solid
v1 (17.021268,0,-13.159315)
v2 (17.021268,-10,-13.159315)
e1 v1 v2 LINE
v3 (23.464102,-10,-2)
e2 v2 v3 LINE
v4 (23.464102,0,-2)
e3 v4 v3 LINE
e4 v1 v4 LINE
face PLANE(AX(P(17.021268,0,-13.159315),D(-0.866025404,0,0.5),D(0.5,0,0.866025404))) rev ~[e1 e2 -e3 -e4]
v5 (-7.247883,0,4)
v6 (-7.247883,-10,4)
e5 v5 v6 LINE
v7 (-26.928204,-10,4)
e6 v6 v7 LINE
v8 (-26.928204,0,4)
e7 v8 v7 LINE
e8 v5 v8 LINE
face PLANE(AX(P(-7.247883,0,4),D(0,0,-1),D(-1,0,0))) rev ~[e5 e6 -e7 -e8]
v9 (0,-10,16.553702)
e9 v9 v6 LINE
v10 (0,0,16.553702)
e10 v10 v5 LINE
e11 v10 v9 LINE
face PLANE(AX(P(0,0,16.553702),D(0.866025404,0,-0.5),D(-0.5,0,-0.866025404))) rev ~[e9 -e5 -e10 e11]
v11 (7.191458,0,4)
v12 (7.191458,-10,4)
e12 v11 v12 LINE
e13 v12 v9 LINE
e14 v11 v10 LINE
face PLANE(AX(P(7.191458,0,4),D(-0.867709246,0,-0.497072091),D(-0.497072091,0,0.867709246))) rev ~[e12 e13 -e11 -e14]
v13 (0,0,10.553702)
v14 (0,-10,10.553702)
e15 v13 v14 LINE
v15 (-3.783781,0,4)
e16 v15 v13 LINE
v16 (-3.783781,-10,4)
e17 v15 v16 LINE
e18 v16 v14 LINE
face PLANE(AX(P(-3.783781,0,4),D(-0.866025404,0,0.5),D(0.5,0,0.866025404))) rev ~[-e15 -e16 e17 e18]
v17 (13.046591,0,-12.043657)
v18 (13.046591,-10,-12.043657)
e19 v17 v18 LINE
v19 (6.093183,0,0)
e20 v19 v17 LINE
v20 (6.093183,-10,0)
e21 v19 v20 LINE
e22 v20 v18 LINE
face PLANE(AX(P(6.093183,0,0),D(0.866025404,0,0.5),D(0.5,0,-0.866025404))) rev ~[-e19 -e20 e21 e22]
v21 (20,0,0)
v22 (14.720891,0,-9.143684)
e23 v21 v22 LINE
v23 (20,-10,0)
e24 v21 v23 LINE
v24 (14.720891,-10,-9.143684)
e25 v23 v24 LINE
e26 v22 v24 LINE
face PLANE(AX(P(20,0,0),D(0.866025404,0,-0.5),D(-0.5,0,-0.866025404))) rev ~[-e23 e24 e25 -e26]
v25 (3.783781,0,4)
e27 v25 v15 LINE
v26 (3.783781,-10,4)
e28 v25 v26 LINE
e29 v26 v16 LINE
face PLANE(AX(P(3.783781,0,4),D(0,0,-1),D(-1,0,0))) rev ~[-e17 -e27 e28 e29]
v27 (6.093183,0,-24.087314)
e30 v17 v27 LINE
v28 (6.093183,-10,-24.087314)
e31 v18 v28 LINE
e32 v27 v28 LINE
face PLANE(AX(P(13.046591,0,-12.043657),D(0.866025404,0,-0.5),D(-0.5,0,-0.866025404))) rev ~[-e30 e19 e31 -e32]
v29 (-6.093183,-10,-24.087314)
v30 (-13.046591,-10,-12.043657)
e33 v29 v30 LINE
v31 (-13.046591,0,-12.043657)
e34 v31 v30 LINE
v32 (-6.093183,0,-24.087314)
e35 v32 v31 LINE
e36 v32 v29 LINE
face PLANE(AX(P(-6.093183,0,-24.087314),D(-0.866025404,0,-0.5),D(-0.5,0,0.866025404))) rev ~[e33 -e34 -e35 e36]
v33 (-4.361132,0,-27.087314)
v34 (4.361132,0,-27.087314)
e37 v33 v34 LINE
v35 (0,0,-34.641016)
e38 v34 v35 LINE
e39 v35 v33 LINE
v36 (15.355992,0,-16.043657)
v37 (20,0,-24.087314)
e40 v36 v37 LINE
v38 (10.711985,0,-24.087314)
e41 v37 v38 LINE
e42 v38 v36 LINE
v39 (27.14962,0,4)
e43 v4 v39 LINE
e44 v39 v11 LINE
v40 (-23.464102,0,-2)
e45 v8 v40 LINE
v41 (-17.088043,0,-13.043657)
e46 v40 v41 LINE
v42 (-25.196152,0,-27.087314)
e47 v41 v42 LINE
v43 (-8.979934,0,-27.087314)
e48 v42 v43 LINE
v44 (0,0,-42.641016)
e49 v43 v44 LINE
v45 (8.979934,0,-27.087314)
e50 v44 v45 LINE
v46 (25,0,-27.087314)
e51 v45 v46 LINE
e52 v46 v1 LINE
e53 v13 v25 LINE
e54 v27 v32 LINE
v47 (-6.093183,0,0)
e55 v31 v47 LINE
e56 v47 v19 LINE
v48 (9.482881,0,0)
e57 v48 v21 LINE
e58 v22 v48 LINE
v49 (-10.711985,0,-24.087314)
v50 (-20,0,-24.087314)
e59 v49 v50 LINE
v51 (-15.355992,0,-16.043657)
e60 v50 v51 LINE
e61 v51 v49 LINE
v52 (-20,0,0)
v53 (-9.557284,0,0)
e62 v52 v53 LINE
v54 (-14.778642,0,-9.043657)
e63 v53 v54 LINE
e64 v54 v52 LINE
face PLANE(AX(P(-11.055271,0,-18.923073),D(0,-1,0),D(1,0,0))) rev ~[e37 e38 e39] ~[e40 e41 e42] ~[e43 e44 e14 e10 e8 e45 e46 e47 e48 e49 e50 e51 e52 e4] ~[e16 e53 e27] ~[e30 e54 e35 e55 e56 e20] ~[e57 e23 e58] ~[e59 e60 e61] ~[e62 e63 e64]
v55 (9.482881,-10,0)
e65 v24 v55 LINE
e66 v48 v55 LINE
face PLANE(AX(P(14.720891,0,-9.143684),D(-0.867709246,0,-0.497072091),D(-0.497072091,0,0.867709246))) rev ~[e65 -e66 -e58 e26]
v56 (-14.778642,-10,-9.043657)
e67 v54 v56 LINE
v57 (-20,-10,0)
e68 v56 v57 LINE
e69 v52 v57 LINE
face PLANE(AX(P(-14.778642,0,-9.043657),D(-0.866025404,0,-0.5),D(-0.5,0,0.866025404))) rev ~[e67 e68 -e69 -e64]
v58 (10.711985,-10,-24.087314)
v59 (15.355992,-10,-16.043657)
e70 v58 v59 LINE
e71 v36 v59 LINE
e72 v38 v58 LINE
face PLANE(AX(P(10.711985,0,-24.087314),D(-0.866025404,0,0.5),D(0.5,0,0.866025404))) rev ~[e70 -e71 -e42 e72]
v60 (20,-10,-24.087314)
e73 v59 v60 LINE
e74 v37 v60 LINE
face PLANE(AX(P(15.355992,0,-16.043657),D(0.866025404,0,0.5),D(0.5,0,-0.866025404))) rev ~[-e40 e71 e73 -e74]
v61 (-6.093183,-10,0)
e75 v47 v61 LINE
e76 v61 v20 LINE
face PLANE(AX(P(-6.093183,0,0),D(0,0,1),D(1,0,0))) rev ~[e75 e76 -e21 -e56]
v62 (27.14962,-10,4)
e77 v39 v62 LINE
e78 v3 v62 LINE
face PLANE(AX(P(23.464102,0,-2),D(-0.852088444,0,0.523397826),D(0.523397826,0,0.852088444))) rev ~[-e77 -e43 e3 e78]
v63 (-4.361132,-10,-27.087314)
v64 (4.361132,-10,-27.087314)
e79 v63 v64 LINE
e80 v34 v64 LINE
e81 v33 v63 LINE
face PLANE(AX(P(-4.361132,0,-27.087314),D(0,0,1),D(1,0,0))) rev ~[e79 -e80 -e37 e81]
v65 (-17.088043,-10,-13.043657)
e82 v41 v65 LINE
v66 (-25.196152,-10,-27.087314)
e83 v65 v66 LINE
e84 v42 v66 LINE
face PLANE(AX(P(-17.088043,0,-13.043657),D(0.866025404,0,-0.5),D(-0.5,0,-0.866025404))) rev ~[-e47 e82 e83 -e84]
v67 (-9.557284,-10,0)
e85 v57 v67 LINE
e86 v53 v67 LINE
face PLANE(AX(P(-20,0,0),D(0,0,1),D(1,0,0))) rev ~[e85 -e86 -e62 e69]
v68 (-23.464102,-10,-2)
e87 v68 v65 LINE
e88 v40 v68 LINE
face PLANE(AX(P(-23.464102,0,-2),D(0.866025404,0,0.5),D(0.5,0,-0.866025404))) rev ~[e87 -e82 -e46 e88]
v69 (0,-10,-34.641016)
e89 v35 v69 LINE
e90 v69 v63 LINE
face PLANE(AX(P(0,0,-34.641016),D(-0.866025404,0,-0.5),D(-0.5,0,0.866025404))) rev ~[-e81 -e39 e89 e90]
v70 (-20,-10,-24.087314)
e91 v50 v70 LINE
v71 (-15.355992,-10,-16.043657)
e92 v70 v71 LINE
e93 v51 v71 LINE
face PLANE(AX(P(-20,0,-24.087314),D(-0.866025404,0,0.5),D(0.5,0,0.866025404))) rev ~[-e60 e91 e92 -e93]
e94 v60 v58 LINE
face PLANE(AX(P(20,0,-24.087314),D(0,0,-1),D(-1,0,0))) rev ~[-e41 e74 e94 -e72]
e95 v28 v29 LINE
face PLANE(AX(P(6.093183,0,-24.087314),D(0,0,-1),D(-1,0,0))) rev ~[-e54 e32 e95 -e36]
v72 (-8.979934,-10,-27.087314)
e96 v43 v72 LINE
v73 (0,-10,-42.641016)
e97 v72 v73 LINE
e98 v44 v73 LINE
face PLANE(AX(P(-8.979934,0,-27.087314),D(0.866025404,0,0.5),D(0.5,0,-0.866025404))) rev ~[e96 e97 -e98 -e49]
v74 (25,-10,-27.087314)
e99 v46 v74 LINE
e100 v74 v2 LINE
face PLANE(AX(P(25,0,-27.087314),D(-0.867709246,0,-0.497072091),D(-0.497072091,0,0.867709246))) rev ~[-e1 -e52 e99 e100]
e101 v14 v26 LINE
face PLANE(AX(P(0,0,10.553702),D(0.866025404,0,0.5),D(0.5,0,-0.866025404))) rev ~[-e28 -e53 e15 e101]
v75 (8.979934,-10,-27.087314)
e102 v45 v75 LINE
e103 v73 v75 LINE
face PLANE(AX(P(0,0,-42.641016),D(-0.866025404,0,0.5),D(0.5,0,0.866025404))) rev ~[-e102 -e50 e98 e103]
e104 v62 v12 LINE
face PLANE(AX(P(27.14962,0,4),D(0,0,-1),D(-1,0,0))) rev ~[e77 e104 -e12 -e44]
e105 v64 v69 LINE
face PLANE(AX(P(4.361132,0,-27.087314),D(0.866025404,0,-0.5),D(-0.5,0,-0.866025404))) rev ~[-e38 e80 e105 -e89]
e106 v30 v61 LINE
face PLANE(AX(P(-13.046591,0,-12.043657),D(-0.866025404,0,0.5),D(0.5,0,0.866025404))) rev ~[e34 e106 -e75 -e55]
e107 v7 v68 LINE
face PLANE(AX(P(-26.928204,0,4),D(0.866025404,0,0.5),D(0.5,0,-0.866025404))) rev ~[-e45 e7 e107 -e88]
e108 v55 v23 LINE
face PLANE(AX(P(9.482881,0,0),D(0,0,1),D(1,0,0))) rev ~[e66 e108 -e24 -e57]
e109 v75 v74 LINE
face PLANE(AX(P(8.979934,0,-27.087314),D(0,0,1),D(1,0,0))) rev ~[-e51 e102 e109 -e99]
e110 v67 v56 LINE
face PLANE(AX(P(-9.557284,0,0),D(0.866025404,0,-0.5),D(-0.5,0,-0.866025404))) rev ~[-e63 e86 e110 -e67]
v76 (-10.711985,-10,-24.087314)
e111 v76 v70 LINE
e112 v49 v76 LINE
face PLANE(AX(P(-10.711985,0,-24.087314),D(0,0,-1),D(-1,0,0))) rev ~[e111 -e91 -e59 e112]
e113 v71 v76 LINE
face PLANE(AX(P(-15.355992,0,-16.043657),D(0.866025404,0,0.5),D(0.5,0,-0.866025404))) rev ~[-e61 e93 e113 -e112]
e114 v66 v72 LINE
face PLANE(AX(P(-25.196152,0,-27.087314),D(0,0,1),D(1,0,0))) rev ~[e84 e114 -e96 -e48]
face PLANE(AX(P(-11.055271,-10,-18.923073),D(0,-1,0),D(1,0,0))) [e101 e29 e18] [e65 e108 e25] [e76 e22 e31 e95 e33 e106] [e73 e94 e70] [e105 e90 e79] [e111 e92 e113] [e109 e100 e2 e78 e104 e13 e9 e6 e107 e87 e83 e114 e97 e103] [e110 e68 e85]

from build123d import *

# Parameters (mm, degrees)
F1_DEPTH = 10


with BuildPart() as f1:
    # F0 (on Front) → F1 (new body)
    with BuildSketch(Plane.XZ):
        Polygon((-10.7119849175, -24.0873143706), (-6.0931825641, -24.0873143706), (-13.046591282, -12.0436571853), (-15.3559924588, -16.0436573585), align=None)
        Polygon((4.3611317565, -27.0873143706), (0, -34.6410161514), (-4.3611317565, -27.0873143706), (-8.9799341099, -27.0873143706), (0, -42.6410164977), (8.9799341099, -27.0873143706), align=None)
        Polygon((13.046591282, -12.0436571853), (6.0931825641, -24.0873143706), (10.7119849175, -24.0873143706), (15.3559924588, -16.0436573585), align=None)
        Polygon((20, 0), (14.7208913197, -9.143684453), (17.0212680072, -13.1593155), (23.4641017651, -2.0000000866), (27.1496195346, 4.00000019), (20, 4.00000019), (7.1914581155, 4.00000019), (9.4828805792, 0), align=None)
        Polygon((-3.7837813776, 4.00000019), (-6.0931825641, 0), (6.0931825641, 0), (3.7837813776, 4.00000019), align=None)
        Polygon((-17.0880432663, -13.0436573585), (-14.7786420896, -9.0436571853), (-20, 0), (-9.5572841792, 0), (-7.2478829927, 4.00000019), (-20, 4.00000019), (-26.9282035399, 4.00000019), (-23.4641017651, -2.0000000866), align=None)
        Polygon((-15.3559924588, -16.0436573585), (-13.046591282, -12.0436571853), (-14.7786420896, -9.0436571853), (-17.0880432663, -13.0436573585), align=None)
        Polygon((-8.9799341099, -27.0873143706), (-4.3611317565, -27.0873143706), (-6.0931825641, -24.0873143706), (-10.7119849175, -24.0873143706), align=None)
        Polygon((6.0931825641, -24.0873143706), (4.3611317565, -27.0873143706), (8.9799341099, -27.0873143706), (10.7119849175, -24.0873143706), align=None)
        Polygon((14.7208913197, -9.143684453), (13.046591282, -12.0436571853), (15.3559924588, -16.0436573585), (17.0212680072, -13.1593155), align=None)
        Polygon((3.7837813776, 4.00000019), (6.0931825641, 0), (9.4828805792, 0), (7.1914581155, 4.00000019), align=None)
        Polygon((-9.5572841792, 0), (-6.0931825641, 0), (-3.7837813776, 4.00000019), (-7.2478829927, 4.00000019), align=None)
        Polygon((-14.7786420896, -9.0436571853), (-13.046591282, -12.0436571853), (-6.0931825641, 0), (-9.5572841792, 0), align=None)
        Polygon((-25.1961524227, -27.0873143706), (-8.9799341099, -27.0873143706), (-10.7119849175, -24.0873143706), (-20, -24.0873143706), (-15.3559924588, -16.0436573585), (-17.0880432663, -13.0436573585), align=None)
        Polygon((-6.0931825641, -24.0873143706), (-4.3611317565, -27.0873143706), (4.3611317565, -27.0873143706), (6.0931825641, -24.0873143706), align=None)
        Polygon((10.7119849175, -24.0873143706), (8.9799341099, -27.0873143706), (25, -27.0873143706), (17.0212680072, -13.1593155), (15.3559924588, -16.0436573585), (20, -24.0873143706), align=None)
        Polygon((6.0931825641, 0), (13.046591282, -12.0436571853), (14.7208913197, -9.143684453), (9.4828805792, 0), align=None)
        Polygon((-7.2478829927, 4.00000019), (-3.7837813776, 4.00000019), (0, 10.5537017807), (3.7837813776, 4.00000019), (7.1914581155, 4.00000019), (0, 16.5537017807), align=None)
    extrude(amount=F1_DEPTH)


solid = f1.part
